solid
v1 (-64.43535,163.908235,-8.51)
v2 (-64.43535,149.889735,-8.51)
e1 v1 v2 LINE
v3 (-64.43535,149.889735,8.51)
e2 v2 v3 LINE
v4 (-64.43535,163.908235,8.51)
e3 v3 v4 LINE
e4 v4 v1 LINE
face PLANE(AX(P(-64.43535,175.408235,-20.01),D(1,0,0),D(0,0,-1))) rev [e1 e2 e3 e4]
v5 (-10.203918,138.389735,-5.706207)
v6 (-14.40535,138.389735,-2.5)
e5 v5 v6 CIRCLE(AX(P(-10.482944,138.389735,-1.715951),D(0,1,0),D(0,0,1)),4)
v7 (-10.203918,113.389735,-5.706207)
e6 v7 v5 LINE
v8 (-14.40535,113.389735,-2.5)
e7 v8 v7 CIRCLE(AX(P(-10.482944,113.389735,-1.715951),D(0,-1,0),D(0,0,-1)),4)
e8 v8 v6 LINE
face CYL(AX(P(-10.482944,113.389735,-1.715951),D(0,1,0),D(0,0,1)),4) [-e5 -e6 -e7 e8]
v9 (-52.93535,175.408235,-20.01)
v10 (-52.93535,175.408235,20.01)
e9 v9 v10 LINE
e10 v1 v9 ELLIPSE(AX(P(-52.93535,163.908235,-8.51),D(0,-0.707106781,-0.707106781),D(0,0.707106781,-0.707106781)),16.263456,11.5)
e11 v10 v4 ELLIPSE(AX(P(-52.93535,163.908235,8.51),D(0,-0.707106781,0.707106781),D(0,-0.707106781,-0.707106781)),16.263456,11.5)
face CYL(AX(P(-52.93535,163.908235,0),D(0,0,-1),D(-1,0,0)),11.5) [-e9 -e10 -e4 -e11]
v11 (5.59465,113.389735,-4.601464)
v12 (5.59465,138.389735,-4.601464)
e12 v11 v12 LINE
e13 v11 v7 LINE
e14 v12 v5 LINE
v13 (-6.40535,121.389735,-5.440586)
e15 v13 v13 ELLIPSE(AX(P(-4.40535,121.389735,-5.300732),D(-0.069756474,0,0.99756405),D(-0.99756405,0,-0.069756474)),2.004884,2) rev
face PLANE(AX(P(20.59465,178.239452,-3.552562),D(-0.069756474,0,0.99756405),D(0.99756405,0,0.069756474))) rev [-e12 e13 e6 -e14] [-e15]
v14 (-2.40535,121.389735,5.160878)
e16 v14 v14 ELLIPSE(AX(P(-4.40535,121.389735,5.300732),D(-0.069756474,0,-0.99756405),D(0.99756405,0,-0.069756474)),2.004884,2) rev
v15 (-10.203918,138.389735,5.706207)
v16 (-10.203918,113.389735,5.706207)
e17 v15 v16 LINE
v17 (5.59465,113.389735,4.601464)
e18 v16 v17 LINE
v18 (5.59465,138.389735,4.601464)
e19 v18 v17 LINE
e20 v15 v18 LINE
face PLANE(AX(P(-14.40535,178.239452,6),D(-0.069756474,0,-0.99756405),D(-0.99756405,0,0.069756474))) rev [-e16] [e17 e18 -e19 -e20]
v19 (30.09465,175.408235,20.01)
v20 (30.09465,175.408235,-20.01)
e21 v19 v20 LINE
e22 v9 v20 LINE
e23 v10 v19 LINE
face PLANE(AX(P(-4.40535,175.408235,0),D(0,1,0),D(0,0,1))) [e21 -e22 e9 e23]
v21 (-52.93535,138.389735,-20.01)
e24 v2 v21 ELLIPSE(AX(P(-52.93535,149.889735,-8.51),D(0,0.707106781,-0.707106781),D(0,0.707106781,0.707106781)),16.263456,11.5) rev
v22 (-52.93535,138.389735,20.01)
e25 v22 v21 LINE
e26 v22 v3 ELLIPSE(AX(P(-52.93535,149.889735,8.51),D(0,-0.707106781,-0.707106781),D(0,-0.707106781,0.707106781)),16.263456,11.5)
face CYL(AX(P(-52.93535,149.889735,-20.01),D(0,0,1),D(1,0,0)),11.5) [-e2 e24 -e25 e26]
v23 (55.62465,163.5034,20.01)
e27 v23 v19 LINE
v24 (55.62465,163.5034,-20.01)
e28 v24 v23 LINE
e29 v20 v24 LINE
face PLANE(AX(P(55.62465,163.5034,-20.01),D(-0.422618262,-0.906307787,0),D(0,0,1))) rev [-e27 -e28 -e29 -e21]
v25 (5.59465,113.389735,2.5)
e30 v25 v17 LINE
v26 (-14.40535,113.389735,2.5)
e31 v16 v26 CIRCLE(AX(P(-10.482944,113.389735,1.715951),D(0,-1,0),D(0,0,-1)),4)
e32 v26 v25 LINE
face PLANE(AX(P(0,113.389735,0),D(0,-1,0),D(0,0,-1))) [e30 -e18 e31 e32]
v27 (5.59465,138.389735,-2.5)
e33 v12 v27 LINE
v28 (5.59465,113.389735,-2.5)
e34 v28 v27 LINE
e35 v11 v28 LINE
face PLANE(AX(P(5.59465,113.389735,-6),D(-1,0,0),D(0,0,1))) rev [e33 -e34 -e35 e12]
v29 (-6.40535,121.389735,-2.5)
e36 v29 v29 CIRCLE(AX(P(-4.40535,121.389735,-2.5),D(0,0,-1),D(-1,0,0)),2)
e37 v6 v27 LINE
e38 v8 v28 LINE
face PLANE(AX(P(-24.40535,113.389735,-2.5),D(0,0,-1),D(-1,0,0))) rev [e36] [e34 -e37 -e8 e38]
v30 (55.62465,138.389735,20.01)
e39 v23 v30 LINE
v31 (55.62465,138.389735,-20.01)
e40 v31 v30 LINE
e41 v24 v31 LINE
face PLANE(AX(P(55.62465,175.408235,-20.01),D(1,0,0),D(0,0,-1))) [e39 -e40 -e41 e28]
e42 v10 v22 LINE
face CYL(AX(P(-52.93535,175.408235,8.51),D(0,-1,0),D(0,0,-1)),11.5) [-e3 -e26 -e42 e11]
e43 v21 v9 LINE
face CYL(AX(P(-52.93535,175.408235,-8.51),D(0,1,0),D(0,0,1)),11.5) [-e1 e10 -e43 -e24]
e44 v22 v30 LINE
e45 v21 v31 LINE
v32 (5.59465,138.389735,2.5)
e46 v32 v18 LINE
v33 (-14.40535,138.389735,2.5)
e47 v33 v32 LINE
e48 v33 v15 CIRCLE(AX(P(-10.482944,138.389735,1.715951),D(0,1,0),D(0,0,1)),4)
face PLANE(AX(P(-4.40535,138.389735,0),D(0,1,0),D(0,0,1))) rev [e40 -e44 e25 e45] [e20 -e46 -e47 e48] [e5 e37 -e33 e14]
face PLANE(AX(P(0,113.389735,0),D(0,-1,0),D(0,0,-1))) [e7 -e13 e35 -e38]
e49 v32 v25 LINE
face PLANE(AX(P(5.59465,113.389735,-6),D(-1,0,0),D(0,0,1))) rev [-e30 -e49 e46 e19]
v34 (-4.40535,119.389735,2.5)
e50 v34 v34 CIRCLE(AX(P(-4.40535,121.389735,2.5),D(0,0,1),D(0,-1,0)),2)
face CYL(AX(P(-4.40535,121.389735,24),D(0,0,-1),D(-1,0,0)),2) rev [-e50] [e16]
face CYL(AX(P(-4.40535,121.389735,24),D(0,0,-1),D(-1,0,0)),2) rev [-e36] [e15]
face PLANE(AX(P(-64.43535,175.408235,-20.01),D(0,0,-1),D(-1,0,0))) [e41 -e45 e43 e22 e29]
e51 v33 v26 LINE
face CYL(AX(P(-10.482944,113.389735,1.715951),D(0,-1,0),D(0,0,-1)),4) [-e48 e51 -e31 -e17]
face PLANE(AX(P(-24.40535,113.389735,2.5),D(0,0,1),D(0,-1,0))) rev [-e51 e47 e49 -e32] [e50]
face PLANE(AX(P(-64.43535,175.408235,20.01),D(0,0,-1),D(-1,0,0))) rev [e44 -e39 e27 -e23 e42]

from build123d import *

# Parameters (mm, degrees)
SKETCH1_W            = 1044
SKETCH1_H            = 348
BOSS_EXTRUDE1_DEPTH  = 321.9
CHAMFER2_SIZE        = 222
CHAMFER2_SIZE2       = 103.52030011
FILLET1_R            = 100
SCALE1_SCALE         = 0.115
SKETCH175_W          = 20
SKETCH175_H          = 12
BOSS_EXTRUDE12_DEPTH = 25
SKETCH176_W          = 5
SKETCH176_H          = 25
CUT_EXTRUDE1_DEPTH   = 30
SKETCH177_R          = 2
CUT_EXTRUDE2_DEPTH   = 30
CUT_EXTRUDE4_DEPTH   = 25
FILLET3_R            = 4


with BuildPart() as part:
    # Sketch1 → Boss-Extrude1 (new body)
    with BuildSketch(Plane(origin=(0, 0, 0), x_dir=(1, 0, 0), z_dir=(0, 1, 0))):
        Rectangle(SKETCH1_W, SKETCH1_H)
    extrude(amount=BOSS_EXTRUDE1_DEPTH)

    # Chamfer2
    chamfer2_edges = [part.edges().sort_by_distance(p)[0] for p in [
        (522, 321.9, 0),
    ]]
    chamfer2_side = [part.faces().sort_by_distance(p)[0] for p in [
        (0, 321.9, 0),
    ]]
    chamfer(chamfer2_edges, length=CHAMFER2_SIZE, length2=CHAMFER2_SIZE2, reference=chamfer2_side[0])

    # Fillet1
    fillet1_edges = [part.edges().sort_by_distance(p)[0] for p in [
        (-522, 321.9, 0),
        (-522, 0, 0),
        (-522, 160.95, -174),
        (-522, 160.95, 174),
    ]]
    fillet(fillet1_edges, radius=FILLET1_R)


with BuildPart() as part_1:
    # Scale1: scaled about (-4.978902211, 156.372589253, 0)
    add(part.part.scale(SCALE1_SCALE).moved(Location((-4.406328457, 138.389741489, 0))))


with BuildPart() as boss_extrude12_tool:
    # Sketch175 → Boss-Extrude12 (new body)
    with BuildSketch(Plane.XZ.offset(-138.389734505)):
        with Locations((-4.405349795, 0)):
            Rectangle(SKETCH175_W, SKETCH175_H)
    extrude(amount=BOSS_EXTRUDE12_DEPTH)


with BuildPart() as part_2:
    add(part_1.part)


with BuildPart() as part_3:
    # Boss-Extrude12: joined with boss_extrude12_tool
    add(part_2.part.fuse(boss_extrude12_tool.part, tol=0.00001))

    # Sketch176 → Cut-Extrude1 (cut)
    with BuildSketch(Plane(origin=(5.594650205, 0, 0), x_dir=(0, 0, -1), z_dir=(1, 0, 0))):
        with Locations((0, 125.889734505)):
            Rectangle(SKETCH176_W, SKETCH176_H)
    extrude(amount=-CUT_EXTRUDE1_DEPTH, mode=Mode.SUBTRACT)

    # Sketch177 → Cut-Extrude2 (cut)
    with BuildSketch(Plane(origin=(0, 0, -6), x_dir=(-1, 0, 0), z_dir=(0, 0, -1))):
        with Locations((4.405349795, 121.389734505)):
            Circle(SKETCH177_R)
    extrude(amount=-CUT_EXTRUDE2_DEPTH, mode=Mode.SUBTRACT)

    # Sketch179 → Cut-Extrude4 (cut)
    with BuildSketch(Plane.XZ.offset(-113.389734505)):
        Polygon((-14.405349795, 6), (20.594650205, 3.552561582), (20.594650205, -3.552561582), (-14.405349795, -6), (23.594650205, -6), (23.594650205, 6), align=None)
    extrude(amount=-CUT_EXTRUDE4_DEPTH, mode=Mode.SUBTRACT)

    # Fillet3
    # the kernel refuses this fillet: 4 mm, written as the material it takes off along each edge
    with BuildSketch(Plane(origin=(-14.405349795, 138.389734505, -6), x_dir=(0, 0, 1), z_dir=(0, -1, 0))) as fillet3_piece_1:
        with BuildLine():
            CenterArc((4.284048925, -3.922405803), FILLET3_R, 101.30386139, 82.69613861)
            Line((0.293792724, -4.201431698), (0.2139876, -4.207012216))
            Line((0.2139876, -4.207012216), (-0.079805124, -0.005580518))
            Line((-0.079805124, -0.005580518), (0, 0.08))
            ThreePointArc((0, 0.08), (1.75, 0.08), (3.484319021, 0.078448116))
            Line((3.484319021, 0.078448116), (3.5, 0))
        make_face()
    extrude(amount=35.529227915, mode=Mode.SUBTRACT)
    with BuildSketch(Plane(origin=(-14.405349795, 138.389734505, 6), x_dir=(0, 0, -1), z_dir=(0, -1, 0))) as fillet3_piece_2:
        with BuildLine():
            CenterArc((4.284048925, 3.922405803), FILLET3_R, 176, 82.69613861)
            Line((0.293792724, 4.201431698), (0.2139876, 4.207012216))
            Line((0.2139876, 4.207012216), (-0.079805124, 0.005580518))
            Line((-0.079805124, 0.005580518), (0, -0.08))
            ThreePointArc((0, -0.08), (1.75, -0.08), (3.484319021, -0.078448116))
            Line((3.484319021, -0.078448116), (3.5, 0))
        make_face()
    extrude(amount=35.529227915, mode=Mode.SUBTRACT)


solid = part_3.part
